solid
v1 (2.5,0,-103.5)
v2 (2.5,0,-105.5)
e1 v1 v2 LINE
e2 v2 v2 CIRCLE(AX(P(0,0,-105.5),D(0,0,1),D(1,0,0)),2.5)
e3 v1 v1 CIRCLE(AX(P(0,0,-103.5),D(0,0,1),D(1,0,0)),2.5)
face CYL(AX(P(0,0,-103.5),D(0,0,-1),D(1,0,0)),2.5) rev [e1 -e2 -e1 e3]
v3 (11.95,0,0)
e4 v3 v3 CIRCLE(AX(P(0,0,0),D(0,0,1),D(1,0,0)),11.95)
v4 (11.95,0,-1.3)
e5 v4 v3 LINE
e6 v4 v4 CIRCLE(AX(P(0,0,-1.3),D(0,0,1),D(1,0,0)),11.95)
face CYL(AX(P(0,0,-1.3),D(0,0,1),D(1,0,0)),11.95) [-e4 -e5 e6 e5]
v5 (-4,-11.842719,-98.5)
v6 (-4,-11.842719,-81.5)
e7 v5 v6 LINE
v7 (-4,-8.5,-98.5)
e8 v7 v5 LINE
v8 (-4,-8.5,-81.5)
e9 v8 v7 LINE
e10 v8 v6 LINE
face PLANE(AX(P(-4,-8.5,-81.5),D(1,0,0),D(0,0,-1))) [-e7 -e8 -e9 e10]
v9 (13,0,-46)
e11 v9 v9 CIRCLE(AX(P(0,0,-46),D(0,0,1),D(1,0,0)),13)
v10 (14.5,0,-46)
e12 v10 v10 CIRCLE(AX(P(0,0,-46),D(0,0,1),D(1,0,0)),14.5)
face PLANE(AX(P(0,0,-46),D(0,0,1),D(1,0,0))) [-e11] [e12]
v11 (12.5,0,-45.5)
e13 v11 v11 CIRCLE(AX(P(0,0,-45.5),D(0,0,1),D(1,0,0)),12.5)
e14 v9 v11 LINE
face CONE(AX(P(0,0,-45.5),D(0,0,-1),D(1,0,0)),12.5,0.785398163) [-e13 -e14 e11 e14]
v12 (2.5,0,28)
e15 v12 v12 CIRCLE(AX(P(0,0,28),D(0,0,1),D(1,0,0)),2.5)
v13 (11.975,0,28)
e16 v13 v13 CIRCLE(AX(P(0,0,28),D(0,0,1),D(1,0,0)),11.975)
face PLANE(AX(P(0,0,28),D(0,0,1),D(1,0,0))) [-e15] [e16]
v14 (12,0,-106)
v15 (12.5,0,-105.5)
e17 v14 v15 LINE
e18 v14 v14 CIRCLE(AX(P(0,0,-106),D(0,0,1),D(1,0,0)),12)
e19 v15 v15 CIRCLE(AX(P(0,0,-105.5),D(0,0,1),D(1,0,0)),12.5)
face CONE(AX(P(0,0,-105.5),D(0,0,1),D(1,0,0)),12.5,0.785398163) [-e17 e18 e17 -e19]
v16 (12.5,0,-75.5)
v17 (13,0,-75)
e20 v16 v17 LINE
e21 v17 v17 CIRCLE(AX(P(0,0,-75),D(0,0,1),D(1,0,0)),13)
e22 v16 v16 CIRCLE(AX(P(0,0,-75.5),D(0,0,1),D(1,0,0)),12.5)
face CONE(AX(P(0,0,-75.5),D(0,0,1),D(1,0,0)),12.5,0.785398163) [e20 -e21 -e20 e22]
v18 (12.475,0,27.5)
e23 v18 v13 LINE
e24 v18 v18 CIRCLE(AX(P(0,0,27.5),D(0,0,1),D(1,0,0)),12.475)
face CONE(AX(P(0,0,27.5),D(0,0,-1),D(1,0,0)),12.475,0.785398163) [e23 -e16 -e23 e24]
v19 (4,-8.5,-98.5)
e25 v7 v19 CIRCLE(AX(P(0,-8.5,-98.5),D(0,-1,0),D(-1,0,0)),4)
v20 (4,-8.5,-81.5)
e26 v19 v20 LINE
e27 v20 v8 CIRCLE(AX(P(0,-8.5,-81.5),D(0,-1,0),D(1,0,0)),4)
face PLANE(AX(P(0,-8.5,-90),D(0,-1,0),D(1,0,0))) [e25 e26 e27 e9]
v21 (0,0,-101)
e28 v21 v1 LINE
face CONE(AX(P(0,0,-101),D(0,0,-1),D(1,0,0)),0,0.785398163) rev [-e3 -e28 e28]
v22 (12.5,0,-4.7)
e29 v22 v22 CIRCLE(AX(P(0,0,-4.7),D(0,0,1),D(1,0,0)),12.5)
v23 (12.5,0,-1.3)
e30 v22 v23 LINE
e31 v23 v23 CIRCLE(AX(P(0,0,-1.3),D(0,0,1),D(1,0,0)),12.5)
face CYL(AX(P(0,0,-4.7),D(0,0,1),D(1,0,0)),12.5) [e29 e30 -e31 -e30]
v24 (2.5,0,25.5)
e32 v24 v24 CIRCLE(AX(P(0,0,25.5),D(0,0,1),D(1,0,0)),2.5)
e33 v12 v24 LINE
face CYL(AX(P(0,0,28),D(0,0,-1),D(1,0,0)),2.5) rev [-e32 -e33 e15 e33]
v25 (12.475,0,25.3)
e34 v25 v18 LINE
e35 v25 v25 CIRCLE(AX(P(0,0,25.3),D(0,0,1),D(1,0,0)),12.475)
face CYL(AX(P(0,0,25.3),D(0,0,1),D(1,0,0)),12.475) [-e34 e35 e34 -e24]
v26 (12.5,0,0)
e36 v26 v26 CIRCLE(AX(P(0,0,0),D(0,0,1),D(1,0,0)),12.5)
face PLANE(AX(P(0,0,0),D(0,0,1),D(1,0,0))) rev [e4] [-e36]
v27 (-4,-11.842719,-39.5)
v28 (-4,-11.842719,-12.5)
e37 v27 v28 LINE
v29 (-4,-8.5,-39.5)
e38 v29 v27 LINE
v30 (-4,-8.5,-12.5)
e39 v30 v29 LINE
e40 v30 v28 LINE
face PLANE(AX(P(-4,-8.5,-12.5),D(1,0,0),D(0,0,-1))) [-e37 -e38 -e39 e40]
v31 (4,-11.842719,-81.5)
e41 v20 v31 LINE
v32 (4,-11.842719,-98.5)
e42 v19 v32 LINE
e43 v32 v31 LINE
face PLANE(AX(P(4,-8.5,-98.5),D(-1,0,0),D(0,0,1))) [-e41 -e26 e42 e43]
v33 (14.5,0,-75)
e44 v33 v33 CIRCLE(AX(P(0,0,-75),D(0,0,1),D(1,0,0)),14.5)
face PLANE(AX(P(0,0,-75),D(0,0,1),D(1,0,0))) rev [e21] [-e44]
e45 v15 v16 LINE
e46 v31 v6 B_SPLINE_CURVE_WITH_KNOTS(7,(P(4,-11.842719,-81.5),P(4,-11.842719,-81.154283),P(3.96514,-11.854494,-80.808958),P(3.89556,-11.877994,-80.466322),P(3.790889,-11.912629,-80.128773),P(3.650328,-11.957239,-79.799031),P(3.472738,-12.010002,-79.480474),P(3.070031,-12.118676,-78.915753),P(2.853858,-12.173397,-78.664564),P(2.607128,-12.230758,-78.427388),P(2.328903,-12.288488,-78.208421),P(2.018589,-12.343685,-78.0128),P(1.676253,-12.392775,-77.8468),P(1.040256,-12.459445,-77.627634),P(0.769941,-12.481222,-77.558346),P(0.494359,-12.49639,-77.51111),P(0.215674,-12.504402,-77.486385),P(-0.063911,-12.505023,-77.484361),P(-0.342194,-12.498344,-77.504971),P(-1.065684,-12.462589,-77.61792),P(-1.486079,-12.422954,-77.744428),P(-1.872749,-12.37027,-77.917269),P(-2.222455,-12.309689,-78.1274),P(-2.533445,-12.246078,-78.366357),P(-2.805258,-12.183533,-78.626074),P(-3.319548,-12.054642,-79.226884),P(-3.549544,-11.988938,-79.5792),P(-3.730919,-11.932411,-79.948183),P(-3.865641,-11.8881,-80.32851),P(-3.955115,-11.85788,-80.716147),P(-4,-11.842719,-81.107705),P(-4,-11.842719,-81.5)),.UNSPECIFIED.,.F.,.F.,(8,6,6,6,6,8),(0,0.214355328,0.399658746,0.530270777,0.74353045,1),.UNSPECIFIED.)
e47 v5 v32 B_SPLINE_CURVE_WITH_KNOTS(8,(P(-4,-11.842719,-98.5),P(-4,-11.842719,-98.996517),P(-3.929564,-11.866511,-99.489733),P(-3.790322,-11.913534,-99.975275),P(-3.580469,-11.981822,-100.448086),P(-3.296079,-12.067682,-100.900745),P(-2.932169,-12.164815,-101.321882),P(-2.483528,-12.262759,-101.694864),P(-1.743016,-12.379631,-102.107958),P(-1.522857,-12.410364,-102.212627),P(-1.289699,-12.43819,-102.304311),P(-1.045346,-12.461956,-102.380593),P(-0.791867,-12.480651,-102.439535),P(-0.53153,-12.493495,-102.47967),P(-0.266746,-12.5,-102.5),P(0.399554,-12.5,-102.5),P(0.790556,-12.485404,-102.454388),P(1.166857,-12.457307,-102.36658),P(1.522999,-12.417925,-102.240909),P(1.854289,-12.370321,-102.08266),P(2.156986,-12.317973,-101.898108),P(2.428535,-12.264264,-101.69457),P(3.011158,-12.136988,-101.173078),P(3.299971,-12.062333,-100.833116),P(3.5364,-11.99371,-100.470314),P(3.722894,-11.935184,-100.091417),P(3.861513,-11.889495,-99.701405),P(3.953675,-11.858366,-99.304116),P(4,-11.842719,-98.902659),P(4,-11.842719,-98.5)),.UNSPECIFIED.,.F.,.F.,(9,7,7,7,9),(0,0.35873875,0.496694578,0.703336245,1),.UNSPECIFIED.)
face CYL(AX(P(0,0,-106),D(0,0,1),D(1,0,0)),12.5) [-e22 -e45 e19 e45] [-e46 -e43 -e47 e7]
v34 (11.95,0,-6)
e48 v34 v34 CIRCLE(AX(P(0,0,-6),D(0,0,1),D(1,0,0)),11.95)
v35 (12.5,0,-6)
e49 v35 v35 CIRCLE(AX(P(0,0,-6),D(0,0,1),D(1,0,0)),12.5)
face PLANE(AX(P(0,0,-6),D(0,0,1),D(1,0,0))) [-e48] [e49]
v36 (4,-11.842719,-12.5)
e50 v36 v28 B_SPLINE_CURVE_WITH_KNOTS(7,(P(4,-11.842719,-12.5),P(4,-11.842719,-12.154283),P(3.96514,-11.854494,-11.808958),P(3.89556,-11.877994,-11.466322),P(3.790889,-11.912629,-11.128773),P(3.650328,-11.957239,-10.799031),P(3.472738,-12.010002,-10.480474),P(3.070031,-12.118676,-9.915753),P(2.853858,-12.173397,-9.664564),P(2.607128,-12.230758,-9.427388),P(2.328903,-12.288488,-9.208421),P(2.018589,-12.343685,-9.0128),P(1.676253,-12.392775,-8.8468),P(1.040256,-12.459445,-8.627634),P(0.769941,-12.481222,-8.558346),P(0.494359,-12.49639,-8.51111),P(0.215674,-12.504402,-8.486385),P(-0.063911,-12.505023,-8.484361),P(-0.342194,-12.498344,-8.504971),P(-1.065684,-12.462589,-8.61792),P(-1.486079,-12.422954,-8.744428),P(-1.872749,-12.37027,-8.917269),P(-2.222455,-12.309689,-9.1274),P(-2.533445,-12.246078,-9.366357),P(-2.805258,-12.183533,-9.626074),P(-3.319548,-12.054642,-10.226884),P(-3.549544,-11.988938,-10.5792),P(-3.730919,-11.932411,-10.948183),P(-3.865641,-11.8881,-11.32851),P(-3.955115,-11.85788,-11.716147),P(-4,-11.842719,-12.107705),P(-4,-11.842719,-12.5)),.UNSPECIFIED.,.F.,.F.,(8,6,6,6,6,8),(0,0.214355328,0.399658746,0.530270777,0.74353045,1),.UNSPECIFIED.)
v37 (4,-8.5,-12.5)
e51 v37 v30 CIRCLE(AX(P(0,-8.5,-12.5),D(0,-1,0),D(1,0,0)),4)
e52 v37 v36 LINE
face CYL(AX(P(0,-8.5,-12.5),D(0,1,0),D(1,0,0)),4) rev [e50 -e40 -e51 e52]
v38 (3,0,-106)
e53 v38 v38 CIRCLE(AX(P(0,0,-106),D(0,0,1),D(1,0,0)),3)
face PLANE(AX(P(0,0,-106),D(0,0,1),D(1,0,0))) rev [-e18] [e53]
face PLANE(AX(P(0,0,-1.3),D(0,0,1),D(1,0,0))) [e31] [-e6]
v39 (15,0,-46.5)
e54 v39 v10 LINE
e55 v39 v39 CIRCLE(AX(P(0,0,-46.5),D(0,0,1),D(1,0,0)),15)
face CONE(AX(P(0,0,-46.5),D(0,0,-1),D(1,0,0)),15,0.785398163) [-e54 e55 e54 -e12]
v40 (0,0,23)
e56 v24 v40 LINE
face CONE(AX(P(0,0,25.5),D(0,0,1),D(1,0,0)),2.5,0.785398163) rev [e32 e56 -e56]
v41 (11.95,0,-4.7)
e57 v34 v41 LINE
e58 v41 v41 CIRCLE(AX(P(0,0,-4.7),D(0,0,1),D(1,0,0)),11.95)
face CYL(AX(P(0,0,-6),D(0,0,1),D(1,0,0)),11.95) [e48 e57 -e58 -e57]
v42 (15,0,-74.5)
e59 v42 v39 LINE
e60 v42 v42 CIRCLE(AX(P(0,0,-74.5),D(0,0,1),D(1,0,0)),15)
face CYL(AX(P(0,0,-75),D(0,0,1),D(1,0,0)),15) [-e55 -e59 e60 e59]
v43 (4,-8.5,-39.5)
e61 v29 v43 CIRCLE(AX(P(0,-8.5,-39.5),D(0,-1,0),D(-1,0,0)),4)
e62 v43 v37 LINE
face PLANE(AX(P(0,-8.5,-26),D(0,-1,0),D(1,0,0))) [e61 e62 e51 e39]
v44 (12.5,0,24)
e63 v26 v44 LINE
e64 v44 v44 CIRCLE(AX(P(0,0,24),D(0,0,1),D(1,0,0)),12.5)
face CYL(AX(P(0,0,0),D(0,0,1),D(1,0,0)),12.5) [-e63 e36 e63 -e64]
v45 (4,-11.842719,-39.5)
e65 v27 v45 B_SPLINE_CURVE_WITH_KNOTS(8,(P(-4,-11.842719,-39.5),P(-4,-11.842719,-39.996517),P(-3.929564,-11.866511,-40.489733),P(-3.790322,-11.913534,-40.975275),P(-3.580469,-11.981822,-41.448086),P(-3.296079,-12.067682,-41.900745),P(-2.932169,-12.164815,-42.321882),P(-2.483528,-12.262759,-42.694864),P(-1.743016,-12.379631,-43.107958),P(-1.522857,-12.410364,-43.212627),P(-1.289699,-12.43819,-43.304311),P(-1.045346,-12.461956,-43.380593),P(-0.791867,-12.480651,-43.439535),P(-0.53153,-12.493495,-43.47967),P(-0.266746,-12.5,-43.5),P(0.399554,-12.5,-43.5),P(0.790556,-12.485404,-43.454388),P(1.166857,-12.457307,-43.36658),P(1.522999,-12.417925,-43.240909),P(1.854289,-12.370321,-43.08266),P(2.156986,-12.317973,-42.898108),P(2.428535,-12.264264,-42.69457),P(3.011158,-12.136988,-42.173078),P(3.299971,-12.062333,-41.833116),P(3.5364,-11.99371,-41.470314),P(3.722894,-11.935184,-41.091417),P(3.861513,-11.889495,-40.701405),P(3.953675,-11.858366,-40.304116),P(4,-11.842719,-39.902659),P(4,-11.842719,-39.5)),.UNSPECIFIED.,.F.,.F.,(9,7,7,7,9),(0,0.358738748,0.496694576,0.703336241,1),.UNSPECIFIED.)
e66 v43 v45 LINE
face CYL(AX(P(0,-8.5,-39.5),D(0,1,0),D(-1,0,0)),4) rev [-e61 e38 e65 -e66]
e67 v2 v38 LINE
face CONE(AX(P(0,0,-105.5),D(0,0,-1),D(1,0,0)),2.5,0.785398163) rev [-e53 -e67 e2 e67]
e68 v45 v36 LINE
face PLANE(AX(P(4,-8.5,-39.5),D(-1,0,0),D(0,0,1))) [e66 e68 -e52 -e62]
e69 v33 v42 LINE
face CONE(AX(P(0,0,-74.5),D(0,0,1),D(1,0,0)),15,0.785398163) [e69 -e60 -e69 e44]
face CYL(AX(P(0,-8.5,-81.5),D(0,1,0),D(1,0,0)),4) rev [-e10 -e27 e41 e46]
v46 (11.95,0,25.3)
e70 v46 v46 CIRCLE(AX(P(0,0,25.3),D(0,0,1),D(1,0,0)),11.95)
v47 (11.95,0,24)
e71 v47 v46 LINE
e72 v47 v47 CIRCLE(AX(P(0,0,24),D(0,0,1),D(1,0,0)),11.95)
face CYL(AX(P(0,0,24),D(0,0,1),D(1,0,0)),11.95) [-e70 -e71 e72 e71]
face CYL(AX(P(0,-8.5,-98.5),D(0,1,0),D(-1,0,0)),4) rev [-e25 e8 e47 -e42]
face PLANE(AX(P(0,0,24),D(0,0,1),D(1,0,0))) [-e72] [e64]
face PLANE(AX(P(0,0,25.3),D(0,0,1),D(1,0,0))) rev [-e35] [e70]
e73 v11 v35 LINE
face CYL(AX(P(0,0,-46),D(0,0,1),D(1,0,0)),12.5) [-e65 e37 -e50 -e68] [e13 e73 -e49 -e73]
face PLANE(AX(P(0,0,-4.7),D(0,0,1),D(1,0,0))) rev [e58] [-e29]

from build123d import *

# Parameters (mm, degrees)
F2_SIZE  = 0.5
F5_DEPTH = 25


with BuildPart() as f1:
    # F0 (on Front) → F1 (revolve)
    with BuildSketch(Plane.XZ):
        Polygon((0, 23), (0, 0), (0, -101), (2.5, -103.5), (2.5, -106), (12.5, -106), (12.5, -105), (12.5, -75), (15, -75), (15, -51), (15, -46), (12.5, -46), (12.5, -6), (11.95, -6), (11.95, -4.7), (12.5, -4.7), (12.5, -1.3), (11.95, -1.3), (11.95, 0), (12.5, 0), (12.5, 24), (11.95, 24), (11.95, 25.3), (12.475, 25.3), (12.475, 28), (2.5, 28), (2.5, 25.5), align=None)
    revolve(axis=Axis((0, 0, -50.5), (0, 0, 1)))

    # F2
    f2_edges = [f1.edges().sort_by_distance(p)[0] for p in [
        (-15, 0, -46),
        (-12.5, 0, -46),
        (-12.5, 0, -75),
        (-15, 0, -75),
        (-12.475, 0, 28),
        (-2.5, 0, -106),
        (-12.5, 0, -106),
    ]]
    chamfer(f2_edges, length=F2_SIZE)

    # F4 (on offset) → F5 (cut)
    with BuildSketch(Plane.XZ.offset(8.5)):
        with BuildLine():
            ThreePointArc((-4, -39.5), (0, -43.5), (4, -39.5))
            Line((4, -39.5), (4, -12.5))
            ThreePointArc((4, -12.5), (0, -8.5), (-4, -12.5))
            Line((-4, -12.5), (-4, -39.5))
        make_face()
        with BuildLine():
            Line((4, -98.5), (4, -81.5))
            ThreePointArc((4, -81.5), (0, -77.5), (-4, -81.5))
            Line((-4, -81.5), (-4, -98.5))
            ThreePointArc((-4, -98.5), (0, -102.5), (4, -98.5))
        make_face()
    extrude(amount=F5_DEPTH, mode=Mode.SUBTRACT)


solid = f1.part
